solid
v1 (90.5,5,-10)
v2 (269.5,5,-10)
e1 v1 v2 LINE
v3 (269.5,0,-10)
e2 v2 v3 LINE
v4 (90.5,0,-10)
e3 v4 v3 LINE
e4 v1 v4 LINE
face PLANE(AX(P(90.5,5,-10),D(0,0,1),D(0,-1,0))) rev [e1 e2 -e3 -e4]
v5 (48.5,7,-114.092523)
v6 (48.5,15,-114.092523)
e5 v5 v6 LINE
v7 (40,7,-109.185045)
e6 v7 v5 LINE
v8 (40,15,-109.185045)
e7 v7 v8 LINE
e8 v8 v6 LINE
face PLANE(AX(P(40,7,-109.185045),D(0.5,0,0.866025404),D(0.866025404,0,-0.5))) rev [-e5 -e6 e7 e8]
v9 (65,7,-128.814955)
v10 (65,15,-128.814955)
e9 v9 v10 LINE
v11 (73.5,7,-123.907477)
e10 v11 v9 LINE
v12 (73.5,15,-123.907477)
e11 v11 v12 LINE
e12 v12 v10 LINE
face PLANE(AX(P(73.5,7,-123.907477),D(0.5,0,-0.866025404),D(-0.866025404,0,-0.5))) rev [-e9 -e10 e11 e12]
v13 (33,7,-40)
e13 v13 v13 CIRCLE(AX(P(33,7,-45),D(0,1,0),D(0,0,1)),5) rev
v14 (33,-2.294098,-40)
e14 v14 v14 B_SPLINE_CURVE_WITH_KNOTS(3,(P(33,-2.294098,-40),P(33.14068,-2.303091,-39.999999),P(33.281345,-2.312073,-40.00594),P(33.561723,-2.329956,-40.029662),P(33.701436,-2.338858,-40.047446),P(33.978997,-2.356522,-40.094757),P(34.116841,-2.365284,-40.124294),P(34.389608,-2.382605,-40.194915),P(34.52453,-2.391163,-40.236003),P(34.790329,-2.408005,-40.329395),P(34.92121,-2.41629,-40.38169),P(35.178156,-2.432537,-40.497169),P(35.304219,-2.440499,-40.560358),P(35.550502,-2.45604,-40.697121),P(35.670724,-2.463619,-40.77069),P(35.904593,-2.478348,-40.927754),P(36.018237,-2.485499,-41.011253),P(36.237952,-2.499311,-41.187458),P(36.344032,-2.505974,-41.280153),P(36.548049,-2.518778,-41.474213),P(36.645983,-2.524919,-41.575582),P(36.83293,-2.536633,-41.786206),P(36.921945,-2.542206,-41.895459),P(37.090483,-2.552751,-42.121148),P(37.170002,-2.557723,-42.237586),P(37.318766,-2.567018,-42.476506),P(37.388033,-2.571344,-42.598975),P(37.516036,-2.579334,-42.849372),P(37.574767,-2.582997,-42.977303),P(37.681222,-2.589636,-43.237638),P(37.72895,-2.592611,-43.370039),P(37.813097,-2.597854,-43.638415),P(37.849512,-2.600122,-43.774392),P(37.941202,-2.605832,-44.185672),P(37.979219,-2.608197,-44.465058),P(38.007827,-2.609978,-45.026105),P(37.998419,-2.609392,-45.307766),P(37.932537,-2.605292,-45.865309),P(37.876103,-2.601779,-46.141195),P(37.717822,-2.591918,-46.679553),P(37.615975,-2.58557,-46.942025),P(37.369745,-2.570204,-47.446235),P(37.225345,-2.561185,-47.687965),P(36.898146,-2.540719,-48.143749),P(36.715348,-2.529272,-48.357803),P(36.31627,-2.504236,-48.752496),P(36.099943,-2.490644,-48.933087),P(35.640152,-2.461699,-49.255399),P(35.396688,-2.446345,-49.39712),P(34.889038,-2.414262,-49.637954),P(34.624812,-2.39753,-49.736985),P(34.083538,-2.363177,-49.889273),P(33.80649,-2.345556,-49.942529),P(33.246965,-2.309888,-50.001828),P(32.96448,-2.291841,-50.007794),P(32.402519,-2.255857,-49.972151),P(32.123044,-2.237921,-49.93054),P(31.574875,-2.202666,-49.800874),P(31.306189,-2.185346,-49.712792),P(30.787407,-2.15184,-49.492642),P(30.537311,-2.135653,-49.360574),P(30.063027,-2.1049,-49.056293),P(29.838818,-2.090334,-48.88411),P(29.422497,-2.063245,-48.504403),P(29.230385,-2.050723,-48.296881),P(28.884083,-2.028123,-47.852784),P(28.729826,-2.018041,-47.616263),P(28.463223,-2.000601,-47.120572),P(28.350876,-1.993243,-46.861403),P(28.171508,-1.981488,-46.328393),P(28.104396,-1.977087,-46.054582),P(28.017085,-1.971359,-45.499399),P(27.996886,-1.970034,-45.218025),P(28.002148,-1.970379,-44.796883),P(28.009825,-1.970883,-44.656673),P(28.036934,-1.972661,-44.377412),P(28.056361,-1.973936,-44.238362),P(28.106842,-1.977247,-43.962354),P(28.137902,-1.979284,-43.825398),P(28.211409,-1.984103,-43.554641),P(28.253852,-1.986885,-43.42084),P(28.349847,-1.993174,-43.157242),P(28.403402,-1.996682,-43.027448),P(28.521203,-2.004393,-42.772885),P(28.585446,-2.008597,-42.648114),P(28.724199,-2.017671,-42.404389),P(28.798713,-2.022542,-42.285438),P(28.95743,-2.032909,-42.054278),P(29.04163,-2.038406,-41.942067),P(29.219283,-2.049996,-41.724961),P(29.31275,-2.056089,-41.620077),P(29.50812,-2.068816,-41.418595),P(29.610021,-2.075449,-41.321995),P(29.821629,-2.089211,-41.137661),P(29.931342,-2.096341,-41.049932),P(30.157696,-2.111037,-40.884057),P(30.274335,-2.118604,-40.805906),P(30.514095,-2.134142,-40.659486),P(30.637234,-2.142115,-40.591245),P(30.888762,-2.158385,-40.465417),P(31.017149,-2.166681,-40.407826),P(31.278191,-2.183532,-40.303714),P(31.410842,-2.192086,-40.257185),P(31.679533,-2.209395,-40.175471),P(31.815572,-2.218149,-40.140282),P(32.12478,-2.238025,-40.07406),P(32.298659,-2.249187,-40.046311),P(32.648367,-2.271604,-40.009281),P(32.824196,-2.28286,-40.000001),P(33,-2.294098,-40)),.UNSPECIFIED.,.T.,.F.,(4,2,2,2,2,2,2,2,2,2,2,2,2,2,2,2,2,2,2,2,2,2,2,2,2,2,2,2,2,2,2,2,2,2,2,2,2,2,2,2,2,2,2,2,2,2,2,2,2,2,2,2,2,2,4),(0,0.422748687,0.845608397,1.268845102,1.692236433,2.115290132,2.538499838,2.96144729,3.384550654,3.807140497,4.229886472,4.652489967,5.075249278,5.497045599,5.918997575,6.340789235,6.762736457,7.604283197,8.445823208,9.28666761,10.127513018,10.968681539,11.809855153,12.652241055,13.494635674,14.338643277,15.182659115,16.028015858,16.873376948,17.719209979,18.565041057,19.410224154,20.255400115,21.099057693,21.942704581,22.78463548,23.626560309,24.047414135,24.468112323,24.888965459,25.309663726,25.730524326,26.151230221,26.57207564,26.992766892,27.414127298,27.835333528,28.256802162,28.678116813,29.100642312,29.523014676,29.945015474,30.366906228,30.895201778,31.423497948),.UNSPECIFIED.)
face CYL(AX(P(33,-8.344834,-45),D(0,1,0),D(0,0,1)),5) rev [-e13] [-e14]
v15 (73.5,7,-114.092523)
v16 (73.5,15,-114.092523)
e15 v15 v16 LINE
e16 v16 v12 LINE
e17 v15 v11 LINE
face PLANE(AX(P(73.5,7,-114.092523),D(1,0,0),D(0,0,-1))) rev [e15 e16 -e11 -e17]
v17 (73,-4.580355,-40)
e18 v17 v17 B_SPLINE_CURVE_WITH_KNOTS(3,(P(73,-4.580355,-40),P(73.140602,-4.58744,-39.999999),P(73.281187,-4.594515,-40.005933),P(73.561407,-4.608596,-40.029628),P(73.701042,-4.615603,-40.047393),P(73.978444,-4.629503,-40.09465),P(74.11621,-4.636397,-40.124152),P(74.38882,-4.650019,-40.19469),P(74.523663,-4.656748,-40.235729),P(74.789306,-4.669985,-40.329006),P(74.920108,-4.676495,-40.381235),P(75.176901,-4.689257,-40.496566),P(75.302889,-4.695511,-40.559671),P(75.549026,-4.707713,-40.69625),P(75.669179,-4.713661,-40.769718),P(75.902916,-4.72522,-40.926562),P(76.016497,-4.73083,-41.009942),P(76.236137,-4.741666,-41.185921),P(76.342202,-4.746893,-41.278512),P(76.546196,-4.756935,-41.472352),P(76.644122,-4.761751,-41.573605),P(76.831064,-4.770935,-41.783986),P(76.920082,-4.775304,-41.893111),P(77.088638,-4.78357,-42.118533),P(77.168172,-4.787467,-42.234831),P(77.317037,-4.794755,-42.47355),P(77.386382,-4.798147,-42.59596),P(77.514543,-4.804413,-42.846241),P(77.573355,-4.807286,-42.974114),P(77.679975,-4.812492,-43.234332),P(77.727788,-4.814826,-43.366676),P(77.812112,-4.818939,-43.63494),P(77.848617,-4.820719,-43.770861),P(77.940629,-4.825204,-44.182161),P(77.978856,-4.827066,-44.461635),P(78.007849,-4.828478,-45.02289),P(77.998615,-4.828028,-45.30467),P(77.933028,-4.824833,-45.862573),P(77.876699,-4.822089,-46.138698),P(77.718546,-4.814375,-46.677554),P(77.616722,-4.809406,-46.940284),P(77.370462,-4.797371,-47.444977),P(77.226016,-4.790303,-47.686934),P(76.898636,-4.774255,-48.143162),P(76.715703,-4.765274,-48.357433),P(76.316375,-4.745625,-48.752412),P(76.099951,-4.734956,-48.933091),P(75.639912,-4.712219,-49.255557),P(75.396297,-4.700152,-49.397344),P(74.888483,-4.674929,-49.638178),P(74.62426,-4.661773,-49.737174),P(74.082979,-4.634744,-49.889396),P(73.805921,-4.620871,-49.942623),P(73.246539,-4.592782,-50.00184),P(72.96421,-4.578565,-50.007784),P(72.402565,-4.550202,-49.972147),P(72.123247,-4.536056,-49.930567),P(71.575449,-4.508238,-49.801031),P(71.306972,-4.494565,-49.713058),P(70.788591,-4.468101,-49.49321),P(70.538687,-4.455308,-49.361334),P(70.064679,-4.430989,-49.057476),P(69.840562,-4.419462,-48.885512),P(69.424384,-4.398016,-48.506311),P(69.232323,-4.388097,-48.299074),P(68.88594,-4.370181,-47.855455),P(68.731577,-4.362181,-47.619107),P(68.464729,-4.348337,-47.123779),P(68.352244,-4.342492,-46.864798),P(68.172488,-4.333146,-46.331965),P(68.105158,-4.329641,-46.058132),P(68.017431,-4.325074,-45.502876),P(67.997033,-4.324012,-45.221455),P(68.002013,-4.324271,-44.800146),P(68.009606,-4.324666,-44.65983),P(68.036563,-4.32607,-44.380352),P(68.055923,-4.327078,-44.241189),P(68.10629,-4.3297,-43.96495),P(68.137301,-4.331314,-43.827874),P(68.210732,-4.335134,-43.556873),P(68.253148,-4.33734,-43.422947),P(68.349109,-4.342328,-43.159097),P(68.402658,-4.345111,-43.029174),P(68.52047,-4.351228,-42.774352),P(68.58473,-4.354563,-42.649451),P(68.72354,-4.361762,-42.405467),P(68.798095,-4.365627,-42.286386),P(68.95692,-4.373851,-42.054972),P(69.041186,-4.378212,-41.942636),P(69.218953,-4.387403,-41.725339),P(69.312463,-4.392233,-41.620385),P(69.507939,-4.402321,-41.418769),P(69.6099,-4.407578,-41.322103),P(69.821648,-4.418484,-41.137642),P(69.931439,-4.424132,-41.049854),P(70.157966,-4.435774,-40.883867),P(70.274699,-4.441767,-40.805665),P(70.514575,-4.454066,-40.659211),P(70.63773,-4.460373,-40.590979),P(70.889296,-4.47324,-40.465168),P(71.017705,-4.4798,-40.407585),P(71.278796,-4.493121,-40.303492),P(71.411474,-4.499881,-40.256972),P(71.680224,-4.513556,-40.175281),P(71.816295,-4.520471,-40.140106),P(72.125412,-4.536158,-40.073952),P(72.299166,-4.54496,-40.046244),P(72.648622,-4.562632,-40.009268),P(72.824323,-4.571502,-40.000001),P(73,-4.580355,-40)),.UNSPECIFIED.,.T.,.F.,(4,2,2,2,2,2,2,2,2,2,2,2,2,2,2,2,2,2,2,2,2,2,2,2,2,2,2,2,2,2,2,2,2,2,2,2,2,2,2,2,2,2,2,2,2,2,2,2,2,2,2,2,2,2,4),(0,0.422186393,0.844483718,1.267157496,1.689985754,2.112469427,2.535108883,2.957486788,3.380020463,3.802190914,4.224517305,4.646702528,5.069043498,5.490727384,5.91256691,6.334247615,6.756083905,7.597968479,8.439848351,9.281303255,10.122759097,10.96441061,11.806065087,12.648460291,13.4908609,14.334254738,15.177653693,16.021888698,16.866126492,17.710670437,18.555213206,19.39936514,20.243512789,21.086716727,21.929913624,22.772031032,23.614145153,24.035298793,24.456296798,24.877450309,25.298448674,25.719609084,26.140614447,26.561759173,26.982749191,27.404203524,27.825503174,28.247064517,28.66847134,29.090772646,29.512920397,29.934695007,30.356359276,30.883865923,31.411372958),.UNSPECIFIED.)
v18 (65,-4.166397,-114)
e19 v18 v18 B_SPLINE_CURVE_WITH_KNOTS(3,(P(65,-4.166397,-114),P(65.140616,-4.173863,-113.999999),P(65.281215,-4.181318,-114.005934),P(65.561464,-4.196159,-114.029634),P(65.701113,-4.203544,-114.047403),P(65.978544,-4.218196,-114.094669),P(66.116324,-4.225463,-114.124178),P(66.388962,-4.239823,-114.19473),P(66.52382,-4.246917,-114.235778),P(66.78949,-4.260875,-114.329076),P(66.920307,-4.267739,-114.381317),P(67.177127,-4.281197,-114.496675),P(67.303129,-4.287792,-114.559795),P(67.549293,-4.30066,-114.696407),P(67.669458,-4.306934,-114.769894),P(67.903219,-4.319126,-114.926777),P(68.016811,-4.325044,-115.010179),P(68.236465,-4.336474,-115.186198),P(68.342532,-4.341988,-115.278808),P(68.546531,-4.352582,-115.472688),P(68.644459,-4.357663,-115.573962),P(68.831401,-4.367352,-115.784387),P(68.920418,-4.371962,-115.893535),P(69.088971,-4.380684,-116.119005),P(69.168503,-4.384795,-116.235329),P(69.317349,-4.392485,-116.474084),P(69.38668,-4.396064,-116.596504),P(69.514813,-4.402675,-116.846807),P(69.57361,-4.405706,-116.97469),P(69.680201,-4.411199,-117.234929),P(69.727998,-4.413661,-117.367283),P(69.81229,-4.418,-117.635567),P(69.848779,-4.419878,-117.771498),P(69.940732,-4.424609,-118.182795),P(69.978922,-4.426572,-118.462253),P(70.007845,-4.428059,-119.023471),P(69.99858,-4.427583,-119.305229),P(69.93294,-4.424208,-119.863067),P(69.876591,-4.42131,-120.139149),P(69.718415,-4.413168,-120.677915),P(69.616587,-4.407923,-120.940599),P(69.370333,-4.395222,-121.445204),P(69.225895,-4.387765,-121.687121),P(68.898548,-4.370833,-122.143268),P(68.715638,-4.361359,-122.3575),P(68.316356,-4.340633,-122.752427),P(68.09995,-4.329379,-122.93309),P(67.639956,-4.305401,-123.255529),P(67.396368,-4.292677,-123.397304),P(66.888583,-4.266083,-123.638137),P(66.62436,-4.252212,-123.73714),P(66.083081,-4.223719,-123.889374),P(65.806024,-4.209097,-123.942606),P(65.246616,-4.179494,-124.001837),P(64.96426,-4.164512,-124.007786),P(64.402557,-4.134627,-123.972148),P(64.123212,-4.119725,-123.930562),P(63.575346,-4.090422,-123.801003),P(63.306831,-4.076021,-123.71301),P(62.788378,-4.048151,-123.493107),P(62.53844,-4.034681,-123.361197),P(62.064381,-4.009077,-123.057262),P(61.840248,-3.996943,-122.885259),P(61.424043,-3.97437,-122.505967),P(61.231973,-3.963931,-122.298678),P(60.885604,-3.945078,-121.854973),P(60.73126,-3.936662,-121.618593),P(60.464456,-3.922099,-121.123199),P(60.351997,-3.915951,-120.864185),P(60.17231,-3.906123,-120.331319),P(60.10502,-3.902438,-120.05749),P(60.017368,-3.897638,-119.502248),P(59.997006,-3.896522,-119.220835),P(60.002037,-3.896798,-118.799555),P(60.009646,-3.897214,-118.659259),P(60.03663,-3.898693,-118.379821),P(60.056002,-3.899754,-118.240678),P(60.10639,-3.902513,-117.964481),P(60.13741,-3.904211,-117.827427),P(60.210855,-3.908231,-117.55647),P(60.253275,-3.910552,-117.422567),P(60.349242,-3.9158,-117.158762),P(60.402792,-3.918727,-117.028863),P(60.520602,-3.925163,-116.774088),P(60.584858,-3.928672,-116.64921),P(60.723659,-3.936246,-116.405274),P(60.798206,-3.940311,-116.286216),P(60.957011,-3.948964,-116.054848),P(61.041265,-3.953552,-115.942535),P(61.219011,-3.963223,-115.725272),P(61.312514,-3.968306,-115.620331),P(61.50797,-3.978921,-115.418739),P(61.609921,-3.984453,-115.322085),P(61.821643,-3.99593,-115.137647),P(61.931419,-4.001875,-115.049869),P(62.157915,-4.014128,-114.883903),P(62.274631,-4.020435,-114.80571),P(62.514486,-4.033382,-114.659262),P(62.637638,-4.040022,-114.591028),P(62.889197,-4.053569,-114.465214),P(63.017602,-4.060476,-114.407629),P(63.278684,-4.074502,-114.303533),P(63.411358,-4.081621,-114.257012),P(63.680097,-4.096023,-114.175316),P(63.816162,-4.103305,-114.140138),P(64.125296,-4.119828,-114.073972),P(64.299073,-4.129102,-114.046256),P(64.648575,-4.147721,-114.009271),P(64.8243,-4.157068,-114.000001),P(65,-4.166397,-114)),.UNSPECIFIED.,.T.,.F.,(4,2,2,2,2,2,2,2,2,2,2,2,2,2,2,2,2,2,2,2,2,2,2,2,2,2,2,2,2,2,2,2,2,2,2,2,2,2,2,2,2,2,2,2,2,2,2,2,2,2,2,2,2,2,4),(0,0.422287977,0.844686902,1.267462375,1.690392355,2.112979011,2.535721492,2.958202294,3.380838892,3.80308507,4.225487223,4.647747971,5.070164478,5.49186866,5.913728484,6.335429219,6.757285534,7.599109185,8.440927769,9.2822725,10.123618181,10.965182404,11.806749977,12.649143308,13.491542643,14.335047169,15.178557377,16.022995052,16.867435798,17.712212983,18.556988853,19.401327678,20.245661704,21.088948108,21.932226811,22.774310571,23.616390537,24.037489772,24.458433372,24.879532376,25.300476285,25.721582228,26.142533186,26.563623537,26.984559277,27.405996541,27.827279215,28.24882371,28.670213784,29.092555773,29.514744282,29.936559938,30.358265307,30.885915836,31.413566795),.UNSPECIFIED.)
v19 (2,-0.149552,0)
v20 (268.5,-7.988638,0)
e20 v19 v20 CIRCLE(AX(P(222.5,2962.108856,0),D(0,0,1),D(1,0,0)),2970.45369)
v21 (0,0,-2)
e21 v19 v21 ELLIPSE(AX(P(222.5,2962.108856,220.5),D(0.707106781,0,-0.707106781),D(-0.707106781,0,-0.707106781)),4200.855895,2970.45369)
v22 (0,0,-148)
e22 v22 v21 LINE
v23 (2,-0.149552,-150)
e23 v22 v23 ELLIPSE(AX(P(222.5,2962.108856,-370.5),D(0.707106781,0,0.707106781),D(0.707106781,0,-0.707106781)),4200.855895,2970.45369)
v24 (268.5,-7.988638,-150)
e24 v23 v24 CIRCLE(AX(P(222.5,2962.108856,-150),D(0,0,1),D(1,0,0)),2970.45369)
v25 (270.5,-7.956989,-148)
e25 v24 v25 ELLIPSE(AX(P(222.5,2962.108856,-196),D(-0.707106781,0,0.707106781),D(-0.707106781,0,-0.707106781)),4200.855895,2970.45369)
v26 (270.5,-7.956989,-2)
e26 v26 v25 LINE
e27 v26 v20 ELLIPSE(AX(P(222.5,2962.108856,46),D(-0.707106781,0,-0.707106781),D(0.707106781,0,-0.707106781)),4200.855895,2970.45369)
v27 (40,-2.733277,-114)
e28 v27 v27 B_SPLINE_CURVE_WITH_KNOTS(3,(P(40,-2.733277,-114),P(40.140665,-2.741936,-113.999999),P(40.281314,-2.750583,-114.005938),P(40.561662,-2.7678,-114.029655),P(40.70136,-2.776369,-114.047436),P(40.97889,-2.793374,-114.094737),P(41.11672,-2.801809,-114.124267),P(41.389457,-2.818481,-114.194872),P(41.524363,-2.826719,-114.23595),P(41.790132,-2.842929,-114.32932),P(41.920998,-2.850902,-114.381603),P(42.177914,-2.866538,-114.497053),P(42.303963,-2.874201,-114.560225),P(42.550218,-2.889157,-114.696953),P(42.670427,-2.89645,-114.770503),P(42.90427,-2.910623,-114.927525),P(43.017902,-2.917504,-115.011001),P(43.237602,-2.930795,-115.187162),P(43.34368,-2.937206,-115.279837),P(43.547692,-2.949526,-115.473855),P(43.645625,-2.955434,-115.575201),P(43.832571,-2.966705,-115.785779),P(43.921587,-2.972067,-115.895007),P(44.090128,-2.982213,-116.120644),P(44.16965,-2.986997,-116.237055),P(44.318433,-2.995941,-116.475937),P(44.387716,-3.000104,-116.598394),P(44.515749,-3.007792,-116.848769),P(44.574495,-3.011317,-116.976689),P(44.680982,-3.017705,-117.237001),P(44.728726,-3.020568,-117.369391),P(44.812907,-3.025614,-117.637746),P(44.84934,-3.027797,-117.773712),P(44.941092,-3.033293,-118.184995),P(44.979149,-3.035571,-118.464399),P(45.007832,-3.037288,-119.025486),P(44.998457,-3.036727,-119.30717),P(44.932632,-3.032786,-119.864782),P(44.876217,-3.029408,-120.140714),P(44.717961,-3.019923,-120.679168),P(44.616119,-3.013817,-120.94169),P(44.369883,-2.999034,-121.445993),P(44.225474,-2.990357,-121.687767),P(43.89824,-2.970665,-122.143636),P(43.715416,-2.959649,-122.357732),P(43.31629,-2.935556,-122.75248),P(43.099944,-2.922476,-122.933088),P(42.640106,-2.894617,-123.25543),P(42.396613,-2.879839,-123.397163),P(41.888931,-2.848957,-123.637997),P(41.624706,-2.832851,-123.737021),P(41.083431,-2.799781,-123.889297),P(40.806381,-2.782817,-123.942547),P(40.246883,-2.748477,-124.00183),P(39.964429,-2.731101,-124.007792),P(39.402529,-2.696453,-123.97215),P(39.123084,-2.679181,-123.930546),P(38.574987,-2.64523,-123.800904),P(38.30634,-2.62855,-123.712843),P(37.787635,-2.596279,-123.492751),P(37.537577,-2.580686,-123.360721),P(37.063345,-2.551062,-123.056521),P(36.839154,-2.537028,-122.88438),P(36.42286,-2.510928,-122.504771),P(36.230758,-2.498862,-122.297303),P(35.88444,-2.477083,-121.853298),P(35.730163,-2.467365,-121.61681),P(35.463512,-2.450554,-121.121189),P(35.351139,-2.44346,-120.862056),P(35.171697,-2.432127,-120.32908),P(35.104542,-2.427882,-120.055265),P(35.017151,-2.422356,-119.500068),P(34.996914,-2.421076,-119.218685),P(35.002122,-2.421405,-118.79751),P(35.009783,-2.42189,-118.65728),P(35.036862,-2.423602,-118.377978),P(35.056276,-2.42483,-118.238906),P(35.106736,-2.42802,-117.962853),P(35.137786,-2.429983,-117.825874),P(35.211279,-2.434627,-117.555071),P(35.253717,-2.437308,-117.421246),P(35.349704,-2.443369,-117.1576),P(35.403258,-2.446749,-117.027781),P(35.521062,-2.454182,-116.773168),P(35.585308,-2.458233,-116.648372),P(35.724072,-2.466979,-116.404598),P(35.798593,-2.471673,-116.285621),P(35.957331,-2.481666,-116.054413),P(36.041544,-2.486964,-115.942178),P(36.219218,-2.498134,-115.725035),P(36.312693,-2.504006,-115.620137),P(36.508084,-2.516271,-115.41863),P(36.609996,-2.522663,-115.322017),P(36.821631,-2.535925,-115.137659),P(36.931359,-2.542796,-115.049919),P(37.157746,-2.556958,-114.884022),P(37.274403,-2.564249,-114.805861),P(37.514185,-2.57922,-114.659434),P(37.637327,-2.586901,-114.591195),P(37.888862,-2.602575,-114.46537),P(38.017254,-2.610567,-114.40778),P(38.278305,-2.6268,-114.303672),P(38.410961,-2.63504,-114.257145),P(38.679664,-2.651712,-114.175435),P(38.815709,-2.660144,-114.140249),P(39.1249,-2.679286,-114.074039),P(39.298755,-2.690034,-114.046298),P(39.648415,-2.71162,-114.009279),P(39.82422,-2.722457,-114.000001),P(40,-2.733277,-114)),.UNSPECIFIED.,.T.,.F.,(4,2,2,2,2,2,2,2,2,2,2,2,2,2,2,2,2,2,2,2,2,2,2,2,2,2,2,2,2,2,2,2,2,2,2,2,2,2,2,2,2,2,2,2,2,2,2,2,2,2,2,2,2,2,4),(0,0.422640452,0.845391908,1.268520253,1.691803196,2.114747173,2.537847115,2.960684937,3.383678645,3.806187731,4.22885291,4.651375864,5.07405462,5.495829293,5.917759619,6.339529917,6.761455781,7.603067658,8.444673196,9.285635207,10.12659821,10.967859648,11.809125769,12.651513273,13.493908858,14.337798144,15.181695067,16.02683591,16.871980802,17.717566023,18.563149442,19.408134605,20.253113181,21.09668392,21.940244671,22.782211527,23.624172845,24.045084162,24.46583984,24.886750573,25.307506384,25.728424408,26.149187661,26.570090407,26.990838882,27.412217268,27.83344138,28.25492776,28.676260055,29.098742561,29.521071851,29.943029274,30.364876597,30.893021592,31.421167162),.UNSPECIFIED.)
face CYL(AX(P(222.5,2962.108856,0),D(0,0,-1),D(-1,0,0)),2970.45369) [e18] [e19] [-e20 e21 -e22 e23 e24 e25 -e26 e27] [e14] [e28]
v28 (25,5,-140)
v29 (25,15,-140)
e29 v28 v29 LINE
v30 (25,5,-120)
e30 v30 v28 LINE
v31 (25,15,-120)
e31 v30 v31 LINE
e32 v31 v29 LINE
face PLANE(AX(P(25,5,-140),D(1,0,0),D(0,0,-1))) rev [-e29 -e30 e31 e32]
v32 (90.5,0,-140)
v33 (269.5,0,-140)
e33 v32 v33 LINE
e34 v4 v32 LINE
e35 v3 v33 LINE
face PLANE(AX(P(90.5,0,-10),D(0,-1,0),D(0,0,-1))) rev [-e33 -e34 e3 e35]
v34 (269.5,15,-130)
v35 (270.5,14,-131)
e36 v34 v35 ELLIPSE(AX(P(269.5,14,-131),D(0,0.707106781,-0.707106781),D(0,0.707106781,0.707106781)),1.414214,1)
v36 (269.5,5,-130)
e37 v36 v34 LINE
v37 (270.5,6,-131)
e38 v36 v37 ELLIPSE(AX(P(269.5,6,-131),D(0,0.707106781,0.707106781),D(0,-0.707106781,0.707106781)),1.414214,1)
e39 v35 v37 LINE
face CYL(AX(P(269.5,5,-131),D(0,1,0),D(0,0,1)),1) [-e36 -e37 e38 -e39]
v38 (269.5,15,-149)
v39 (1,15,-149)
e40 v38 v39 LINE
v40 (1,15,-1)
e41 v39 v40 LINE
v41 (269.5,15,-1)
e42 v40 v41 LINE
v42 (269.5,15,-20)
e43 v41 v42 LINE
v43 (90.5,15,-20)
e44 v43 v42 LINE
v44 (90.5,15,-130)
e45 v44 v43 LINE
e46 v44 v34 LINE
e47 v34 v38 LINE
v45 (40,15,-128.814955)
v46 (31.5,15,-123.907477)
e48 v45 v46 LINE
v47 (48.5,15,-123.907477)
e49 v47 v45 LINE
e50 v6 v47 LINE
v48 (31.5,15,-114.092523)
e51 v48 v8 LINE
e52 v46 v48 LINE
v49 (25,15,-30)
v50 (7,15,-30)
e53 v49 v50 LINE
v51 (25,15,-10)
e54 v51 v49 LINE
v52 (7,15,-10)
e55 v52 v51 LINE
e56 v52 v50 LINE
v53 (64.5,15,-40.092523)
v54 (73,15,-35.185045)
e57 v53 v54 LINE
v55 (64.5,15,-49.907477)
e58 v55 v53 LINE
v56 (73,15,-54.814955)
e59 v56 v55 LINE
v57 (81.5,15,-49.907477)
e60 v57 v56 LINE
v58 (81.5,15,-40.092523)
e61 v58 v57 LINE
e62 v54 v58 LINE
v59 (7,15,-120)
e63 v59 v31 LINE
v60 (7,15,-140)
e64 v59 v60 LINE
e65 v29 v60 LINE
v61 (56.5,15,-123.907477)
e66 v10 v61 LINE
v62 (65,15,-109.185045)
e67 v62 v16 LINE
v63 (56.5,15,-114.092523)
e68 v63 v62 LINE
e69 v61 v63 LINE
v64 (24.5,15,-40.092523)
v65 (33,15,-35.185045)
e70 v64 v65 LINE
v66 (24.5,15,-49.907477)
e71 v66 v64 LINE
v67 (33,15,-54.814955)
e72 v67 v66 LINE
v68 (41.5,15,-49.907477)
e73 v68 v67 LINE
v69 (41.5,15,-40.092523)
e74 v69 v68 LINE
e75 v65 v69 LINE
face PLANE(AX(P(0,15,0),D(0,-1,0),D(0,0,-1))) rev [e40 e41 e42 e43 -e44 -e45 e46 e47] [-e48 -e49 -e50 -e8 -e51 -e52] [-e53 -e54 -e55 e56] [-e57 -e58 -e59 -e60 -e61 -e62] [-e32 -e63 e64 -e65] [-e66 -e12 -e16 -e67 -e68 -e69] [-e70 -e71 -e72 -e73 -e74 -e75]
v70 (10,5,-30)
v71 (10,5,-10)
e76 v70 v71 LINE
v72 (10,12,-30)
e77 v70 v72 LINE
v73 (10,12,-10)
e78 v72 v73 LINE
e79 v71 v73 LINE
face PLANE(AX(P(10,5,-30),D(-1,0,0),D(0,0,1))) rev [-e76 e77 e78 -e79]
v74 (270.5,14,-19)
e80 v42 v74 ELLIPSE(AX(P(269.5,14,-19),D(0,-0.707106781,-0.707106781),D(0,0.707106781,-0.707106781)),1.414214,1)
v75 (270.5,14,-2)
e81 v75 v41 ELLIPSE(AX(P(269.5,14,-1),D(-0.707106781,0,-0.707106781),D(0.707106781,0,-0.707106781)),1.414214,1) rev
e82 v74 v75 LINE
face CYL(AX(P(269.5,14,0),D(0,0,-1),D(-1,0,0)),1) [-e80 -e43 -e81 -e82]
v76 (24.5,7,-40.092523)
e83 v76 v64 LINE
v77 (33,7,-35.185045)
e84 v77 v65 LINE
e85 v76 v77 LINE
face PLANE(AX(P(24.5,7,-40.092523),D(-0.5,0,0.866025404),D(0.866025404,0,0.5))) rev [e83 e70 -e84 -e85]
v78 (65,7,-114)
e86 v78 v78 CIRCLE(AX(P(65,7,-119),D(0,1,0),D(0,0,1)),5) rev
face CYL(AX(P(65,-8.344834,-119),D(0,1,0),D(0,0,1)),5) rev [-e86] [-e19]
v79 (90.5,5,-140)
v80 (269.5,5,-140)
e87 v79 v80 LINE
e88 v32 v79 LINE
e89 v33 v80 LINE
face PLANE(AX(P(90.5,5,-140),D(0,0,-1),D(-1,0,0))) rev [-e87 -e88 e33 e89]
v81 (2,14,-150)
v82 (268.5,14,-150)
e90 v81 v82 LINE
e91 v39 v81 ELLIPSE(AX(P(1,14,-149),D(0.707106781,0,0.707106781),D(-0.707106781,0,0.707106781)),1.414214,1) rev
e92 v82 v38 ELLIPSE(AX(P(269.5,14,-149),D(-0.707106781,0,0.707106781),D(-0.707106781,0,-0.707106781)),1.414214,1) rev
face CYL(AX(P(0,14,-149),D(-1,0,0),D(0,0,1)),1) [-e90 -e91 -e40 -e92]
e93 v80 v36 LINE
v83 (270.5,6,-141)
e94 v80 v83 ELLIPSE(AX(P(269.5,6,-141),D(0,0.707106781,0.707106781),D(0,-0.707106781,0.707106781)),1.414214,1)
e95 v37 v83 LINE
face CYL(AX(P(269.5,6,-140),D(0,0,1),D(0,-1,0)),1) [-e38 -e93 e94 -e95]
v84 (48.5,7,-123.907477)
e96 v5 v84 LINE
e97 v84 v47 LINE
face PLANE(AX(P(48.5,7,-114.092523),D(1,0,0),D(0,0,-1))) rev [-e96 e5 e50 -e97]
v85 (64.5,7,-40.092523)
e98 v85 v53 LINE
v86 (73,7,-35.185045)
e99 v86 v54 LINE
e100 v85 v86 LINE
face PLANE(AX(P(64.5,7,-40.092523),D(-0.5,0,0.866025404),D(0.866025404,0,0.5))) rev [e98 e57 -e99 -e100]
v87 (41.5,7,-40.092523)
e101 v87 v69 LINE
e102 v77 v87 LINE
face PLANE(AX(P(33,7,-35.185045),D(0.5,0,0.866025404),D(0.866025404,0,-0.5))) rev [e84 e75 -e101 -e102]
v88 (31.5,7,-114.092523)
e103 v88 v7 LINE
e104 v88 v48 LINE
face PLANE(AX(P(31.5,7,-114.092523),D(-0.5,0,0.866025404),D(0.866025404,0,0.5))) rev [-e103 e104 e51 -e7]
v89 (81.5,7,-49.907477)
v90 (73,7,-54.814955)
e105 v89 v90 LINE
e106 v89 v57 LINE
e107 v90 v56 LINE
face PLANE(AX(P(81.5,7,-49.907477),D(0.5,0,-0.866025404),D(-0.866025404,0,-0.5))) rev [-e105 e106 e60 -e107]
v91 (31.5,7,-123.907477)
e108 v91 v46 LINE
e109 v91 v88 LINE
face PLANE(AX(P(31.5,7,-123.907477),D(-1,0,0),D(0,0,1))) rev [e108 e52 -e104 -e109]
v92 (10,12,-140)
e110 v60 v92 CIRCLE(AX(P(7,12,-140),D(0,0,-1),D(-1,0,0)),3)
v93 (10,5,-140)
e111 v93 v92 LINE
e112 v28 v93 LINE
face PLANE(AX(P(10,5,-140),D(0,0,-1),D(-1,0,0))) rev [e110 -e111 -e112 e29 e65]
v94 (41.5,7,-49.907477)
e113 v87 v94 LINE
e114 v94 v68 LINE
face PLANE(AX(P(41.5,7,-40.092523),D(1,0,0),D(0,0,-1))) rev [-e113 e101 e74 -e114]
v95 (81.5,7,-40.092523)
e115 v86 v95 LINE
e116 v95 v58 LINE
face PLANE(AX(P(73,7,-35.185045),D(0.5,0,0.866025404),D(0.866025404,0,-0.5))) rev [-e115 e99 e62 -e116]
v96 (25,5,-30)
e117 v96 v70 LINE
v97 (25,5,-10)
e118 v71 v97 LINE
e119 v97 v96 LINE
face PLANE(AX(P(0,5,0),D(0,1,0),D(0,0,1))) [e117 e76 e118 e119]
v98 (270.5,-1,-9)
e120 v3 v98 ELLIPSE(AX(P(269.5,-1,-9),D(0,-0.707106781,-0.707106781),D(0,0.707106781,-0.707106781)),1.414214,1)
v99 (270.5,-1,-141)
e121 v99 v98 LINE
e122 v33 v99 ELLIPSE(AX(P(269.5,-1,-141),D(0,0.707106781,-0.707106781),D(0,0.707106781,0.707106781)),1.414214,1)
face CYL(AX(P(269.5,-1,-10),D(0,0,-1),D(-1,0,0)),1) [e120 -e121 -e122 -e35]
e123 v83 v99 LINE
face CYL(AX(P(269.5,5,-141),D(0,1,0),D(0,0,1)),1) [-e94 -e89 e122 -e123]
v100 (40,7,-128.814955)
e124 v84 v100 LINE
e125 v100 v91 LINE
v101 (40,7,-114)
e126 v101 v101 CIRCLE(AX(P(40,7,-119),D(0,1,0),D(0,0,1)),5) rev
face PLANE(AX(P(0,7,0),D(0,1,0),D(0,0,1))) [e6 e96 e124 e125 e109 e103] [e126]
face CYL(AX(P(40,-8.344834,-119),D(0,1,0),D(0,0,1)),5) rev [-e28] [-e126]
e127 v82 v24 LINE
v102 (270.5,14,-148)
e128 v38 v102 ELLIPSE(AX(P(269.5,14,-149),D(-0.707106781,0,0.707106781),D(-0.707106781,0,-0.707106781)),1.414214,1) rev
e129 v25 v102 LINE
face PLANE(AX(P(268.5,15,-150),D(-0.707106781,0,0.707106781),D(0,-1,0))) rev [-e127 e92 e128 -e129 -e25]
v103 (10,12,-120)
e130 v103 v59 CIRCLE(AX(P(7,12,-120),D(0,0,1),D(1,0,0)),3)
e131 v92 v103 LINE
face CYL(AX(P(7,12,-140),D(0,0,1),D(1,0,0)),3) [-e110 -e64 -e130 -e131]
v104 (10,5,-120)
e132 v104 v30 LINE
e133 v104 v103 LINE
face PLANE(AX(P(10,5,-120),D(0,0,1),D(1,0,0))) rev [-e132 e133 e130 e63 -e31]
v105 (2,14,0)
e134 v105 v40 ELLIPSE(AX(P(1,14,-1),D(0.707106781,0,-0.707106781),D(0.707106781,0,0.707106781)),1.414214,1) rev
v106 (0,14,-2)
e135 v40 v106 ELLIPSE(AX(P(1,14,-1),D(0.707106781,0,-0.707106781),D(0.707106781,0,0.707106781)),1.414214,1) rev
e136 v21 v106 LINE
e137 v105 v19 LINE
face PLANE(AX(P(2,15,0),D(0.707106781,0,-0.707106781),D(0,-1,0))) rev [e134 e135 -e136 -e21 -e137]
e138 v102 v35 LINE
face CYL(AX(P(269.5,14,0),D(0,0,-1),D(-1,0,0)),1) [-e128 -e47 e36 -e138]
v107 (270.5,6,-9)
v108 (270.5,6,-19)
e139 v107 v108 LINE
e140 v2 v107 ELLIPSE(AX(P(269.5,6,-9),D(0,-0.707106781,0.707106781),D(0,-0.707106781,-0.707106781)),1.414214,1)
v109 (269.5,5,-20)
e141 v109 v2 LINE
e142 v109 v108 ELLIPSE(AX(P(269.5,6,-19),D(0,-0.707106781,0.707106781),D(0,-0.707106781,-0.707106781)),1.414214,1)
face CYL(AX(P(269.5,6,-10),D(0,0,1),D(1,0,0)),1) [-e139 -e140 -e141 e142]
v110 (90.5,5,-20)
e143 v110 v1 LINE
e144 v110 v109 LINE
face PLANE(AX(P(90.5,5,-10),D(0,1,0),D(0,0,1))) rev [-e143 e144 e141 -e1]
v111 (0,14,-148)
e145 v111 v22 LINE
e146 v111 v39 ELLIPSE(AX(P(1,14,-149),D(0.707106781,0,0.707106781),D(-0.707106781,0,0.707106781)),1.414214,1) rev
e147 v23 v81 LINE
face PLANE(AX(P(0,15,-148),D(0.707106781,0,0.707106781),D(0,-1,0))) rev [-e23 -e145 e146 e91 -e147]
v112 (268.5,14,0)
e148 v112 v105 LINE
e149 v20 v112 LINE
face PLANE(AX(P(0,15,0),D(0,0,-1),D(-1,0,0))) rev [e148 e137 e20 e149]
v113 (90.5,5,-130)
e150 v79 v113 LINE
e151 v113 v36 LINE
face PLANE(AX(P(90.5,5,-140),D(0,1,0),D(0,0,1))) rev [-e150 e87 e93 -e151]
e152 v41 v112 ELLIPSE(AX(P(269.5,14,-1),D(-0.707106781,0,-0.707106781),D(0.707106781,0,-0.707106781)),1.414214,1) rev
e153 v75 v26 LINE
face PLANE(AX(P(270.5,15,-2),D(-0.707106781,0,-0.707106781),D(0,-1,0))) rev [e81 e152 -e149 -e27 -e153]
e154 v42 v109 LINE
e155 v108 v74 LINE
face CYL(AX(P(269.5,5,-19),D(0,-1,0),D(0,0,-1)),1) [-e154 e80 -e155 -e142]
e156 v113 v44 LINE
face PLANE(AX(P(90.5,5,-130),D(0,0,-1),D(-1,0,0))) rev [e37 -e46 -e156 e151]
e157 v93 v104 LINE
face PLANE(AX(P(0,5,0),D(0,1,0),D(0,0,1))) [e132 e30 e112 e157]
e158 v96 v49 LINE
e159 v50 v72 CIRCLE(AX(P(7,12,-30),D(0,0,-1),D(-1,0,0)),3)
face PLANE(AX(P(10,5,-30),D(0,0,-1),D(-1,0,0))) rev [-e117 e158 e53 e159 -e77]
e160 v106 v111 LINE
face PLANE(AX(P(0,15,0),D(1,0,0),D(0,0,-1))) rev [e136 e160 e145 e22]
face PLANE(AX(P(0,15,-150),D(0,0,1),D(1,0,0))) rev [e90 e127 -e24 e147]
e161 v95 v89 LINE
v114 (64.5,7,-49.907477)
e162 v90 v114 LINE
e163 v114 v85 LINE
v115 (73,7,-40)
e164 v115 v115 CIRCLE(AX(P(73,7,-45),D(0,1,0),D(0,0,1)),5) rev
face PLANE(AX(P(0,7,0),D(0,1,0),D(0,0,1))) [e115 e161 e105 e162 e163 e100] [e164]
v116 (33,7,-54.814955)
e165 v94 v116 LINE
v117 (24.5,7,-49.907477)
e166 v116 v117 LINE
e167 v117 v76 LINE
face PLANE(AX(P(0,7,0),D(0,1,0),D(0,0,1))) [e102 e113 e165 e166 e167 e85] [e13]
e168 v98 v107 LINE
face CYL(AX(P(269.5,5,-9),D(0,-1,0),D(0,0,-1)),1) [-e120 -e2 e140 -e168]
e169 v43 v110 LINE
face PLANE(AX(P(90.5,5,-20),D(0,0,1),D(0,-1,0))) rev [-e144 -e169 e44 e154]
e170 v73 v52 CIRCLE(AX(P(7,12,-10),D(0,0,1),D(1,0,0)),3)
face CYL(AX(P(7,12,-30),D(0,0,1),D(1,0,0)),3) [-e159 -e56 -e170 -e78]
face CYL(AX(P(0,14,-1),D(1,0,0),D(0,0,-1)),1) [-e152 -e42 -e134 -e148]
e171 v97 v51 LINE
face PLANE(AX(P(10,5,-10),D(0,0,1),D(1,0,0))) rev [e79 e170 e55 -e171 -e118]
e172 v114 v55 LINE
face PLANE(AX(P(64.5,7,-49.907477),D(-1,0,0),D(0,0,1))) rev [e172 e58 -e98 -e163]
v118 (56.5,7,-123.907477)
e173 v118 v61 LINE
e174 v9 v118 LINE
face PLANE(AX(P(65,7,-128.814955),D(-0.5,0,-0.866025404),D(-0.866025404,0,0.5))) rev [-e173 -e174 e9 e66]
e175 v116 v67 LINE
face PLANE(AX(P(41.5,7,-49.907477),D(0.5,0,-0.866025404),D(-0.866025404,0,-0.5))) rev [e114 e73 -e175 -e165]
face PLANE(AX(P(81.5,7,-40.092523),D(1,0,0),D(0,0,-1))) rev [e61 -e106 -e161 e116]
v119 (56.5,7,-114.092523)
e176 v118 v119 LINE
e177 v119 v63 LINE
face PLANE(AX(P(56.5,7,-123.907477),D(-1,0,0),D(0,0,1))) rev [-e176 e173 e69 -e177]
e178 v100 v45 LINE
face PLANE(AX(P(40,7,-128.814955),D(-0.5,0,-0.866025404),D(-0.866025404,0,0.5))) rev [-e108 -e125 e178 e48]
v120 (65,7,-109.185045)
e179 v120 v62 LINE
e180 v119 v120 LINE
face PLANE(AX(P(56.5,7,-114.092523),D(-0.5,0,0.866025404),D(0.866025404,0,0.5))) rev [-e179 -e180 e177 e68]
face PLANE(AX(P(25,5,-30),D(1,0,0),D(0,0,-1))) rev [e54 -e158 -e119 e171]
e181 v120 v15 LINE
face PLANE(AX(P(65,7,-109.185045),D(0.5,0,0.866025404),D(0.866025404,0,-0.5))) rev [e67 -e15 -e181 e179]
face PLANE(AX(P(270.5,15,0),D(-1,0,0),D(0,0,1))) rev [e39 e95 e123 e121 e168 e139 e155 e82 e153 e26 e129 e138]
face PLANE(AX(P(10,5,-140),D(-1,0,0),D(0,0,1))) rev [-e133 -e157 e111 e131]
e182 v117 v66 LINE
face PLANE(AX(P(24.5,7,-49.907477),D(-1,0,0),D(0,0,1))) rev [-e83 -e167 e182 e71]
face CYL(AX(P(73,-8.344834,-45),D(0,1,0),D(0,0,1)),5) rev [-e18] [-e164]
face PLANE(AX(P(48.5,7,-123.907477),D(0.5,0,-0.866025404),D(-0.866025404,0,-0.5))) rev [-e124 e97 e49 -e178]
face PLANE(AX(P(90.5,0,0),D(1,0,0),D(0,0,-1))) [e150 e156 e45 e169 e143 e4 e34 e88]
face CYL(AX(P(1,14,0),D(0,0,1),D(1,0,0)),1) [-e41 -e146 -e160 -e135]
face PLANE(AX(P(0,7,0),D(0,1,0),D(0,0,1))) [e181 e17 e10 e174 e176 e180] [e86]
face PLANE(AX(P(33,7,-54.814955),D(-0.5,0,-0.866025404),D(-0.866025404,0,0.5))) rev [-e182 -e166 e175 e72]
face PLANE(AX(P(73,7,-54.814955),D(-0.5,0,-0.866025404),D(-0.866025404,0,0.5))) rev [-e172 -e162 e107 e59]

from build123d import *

# Parameters (mm, degrees)
SKETCH1_W               = 270.5
SKETCH1_H               = 150
BOSS_EXTRUDE1_DEPTH     = 15
BOSS_EXTRUDE5_DEPTH     = 150
CUT_EXTRUDE7_DEPTH      = 311.185801218
CUT_EXTRUDE7_DEPTH_BACK = 311.185801218
SKETCH5_R               = 5
CUT_EXTRUDE8_DEPTH      = 8
CUT_EXTRUDE9_DEPTH      = 180
CHAMFER1_SIZE           = 2
SKETCH16_W              = 15
SKETCH16_H              = 20
CUT_EXTRUDE10_DEPTH     = 10
FILLET2_R               = 1
FILLET3_R               = 3


with BuildPart() as part:
    # Sketch1 → Boss-Extrude1 (new body)
    with BuildSketch(Plane(origin=(0, 0, 0), x_dir=(1, 0, 0), z_dir=(0, 1, 0))):
        with Locations((135.25, 75)):
            Rectangle(SKETCH1_W, SKETCH1_H)
    extrude(amount=BOSS_EXTRUDE1_DEPTH)

    # Sketch12 → Boss-Extrude5 (add)
    with BuildSketch(Plane.XY.offset(-150)):
        with BuildLine():
            Line((270.5, 0), (270.5, -7.956989195))
            ThreePointArc((270.5, -7.956989195), (135.159339828, -7.060511664), (0, 0))
            Line((0, 0), (270.5, 0))
        make_face()
    extrude(amount=BOSS_EXTRUDE5_DEPTH)

    # Sketch5 → Cut-Extrude7 (cut, two sides: drawn at the far end of the back side and taken through both)
    with BuildSketch(Plane(origin=(0, 15, 0), x_dir=(1, 0, 0), z_dir=(0, 1, 0)).offset(-CUT_EXTRUDE7_DEPTH_BACK)):
        with Locations(Location((33, 45, 0), (0, 0, 270))):
            Circle(SKETCH5_R)
        with Locations(Location((40, 119, 0), (0, 0, 270))):
            Circle(SKETCH5_R)
        with Locations(Location((65, 119, 0), (0, 0, 270))):
            Circle(SKETCH5_R)
        with Locations(Location((73, 45, 0), (0, 0, 270))):
            Circle(SKETCH5_R)
    extrude(amount=CUT_EXTRUDE7_DEPTH + CUT_EXTRUDE7_DEPTH_BACK, mode=Mode.SUBTRACT)

    # Sketch13 → Cut-Extrude8 (cut)
    with BuildSketch(Plane(origin=(0, 15, 0), x_dir=(1, 0, 0), z_dir=(0, 1, 0))):
        Polygon((40, 109.185045424), (48.5, 114.092522712), (48.5, 123.907477288), (40, 128.814954576), (31.5, 123.907477288), (31.5, 114.092522712), align=None)
        Polygon((65, 109.185045424), (73.5, 114.092522712), (73.5, 123.907477288), (65, 128.814954576), (56.5, 123.907477288), (56.5, 114.092522712), align=None)
        Polygon((33, 35.185045424), (41.5, 40.092522712), (41.5, 49.907477288), (33, 54.814954576), (24.5, 49.907477288), (24.5, 40.092522712), align=None)
        Polygon((73, 35.185045424), (81.5, 40.092522712), (81.5, 49.907477288), (73, 54.814954576), (64.5, 49.907477288), (64.5, 40.092522712), align=None)
    extrude(amount=-CUT_EXTRUDE8_DEPTH, mode=Mode.SUBTRACT)

    # Sketch15 → Cut-Extrude9 (cut)
    with BuildSketch(Plane(origin=(270.5, 0, 0), x_dir=(0, 0, -1), z_dir=(1, 0, 0))):
        Polygon((20, 15), (130, 15), (130, 5), (140, 5), (140, 0), (10, 0), (10, 5), (20, 5), align=None)
    extrude(amount=-CUT_EXTRUDE9_DEPTH, mode=Mode.SUBTRACT)

    # Chamfer1
    chamfer1_edges = [part.edges().sort_by_distance(p)[0] for p in [
        (0, 7.5, -150),
        (270.5, 3.521505402, -150),
        (270.5, 3.521505402, 0),
        (0, 7.5, 0),
    ]]
    chamfer(chamfer1_edges, length=CHAMFER1_SIZE)

    # Sketch16 → Cut-Extrude10 (cut)
    with BuildSketch(Plane(origin=(0, 15, 0), x_dir=(1, 0, 0), z_dir=(0, 1, 0))):
        with Locations((17.5, 20)):
            Rectangle(SKETCH16_W, SKETCH16_H)
        with Locations((17.5, 130)):
            Rectangle(SKETCH16_W, SKETCH16_H)
    extrude(amount=-CUT_EXTRUDE10_DEPTH, mode=Mode.SUBTRACT)

    # Fillet2
    fillet2_edges = [part.edges().sort_by_distance(p)[0] for p in [
        (270.5, 15, -139),
        (270.5, 10, -130),
        (270.5, 5, -135),
        (270.5, 2.5, -140),
        (270.5, 0, -75),
        (270.5, 2.5, -10),
        (270.5, 5, -15),
        (270.5, 10, -20),
        (270.5, 15, -11),
        (135.25, 15, -150),
        (135.25, 15, 0),
        (0, 15, -75),
    ]]
    fillet(fillet2_edges, radius=FILLET2_R - 0.0001)  # a hair under: the kernel refuses the full size

    # Fillet3
    fillet3_edges = [part.edges().sort_by_distance(p)[0] for p in [
        (10, 15, -130),
        (10, 15, -20),
    ]]
    fillet(fillet3_edges, radius=FILLET3_R)


solid = part.part
